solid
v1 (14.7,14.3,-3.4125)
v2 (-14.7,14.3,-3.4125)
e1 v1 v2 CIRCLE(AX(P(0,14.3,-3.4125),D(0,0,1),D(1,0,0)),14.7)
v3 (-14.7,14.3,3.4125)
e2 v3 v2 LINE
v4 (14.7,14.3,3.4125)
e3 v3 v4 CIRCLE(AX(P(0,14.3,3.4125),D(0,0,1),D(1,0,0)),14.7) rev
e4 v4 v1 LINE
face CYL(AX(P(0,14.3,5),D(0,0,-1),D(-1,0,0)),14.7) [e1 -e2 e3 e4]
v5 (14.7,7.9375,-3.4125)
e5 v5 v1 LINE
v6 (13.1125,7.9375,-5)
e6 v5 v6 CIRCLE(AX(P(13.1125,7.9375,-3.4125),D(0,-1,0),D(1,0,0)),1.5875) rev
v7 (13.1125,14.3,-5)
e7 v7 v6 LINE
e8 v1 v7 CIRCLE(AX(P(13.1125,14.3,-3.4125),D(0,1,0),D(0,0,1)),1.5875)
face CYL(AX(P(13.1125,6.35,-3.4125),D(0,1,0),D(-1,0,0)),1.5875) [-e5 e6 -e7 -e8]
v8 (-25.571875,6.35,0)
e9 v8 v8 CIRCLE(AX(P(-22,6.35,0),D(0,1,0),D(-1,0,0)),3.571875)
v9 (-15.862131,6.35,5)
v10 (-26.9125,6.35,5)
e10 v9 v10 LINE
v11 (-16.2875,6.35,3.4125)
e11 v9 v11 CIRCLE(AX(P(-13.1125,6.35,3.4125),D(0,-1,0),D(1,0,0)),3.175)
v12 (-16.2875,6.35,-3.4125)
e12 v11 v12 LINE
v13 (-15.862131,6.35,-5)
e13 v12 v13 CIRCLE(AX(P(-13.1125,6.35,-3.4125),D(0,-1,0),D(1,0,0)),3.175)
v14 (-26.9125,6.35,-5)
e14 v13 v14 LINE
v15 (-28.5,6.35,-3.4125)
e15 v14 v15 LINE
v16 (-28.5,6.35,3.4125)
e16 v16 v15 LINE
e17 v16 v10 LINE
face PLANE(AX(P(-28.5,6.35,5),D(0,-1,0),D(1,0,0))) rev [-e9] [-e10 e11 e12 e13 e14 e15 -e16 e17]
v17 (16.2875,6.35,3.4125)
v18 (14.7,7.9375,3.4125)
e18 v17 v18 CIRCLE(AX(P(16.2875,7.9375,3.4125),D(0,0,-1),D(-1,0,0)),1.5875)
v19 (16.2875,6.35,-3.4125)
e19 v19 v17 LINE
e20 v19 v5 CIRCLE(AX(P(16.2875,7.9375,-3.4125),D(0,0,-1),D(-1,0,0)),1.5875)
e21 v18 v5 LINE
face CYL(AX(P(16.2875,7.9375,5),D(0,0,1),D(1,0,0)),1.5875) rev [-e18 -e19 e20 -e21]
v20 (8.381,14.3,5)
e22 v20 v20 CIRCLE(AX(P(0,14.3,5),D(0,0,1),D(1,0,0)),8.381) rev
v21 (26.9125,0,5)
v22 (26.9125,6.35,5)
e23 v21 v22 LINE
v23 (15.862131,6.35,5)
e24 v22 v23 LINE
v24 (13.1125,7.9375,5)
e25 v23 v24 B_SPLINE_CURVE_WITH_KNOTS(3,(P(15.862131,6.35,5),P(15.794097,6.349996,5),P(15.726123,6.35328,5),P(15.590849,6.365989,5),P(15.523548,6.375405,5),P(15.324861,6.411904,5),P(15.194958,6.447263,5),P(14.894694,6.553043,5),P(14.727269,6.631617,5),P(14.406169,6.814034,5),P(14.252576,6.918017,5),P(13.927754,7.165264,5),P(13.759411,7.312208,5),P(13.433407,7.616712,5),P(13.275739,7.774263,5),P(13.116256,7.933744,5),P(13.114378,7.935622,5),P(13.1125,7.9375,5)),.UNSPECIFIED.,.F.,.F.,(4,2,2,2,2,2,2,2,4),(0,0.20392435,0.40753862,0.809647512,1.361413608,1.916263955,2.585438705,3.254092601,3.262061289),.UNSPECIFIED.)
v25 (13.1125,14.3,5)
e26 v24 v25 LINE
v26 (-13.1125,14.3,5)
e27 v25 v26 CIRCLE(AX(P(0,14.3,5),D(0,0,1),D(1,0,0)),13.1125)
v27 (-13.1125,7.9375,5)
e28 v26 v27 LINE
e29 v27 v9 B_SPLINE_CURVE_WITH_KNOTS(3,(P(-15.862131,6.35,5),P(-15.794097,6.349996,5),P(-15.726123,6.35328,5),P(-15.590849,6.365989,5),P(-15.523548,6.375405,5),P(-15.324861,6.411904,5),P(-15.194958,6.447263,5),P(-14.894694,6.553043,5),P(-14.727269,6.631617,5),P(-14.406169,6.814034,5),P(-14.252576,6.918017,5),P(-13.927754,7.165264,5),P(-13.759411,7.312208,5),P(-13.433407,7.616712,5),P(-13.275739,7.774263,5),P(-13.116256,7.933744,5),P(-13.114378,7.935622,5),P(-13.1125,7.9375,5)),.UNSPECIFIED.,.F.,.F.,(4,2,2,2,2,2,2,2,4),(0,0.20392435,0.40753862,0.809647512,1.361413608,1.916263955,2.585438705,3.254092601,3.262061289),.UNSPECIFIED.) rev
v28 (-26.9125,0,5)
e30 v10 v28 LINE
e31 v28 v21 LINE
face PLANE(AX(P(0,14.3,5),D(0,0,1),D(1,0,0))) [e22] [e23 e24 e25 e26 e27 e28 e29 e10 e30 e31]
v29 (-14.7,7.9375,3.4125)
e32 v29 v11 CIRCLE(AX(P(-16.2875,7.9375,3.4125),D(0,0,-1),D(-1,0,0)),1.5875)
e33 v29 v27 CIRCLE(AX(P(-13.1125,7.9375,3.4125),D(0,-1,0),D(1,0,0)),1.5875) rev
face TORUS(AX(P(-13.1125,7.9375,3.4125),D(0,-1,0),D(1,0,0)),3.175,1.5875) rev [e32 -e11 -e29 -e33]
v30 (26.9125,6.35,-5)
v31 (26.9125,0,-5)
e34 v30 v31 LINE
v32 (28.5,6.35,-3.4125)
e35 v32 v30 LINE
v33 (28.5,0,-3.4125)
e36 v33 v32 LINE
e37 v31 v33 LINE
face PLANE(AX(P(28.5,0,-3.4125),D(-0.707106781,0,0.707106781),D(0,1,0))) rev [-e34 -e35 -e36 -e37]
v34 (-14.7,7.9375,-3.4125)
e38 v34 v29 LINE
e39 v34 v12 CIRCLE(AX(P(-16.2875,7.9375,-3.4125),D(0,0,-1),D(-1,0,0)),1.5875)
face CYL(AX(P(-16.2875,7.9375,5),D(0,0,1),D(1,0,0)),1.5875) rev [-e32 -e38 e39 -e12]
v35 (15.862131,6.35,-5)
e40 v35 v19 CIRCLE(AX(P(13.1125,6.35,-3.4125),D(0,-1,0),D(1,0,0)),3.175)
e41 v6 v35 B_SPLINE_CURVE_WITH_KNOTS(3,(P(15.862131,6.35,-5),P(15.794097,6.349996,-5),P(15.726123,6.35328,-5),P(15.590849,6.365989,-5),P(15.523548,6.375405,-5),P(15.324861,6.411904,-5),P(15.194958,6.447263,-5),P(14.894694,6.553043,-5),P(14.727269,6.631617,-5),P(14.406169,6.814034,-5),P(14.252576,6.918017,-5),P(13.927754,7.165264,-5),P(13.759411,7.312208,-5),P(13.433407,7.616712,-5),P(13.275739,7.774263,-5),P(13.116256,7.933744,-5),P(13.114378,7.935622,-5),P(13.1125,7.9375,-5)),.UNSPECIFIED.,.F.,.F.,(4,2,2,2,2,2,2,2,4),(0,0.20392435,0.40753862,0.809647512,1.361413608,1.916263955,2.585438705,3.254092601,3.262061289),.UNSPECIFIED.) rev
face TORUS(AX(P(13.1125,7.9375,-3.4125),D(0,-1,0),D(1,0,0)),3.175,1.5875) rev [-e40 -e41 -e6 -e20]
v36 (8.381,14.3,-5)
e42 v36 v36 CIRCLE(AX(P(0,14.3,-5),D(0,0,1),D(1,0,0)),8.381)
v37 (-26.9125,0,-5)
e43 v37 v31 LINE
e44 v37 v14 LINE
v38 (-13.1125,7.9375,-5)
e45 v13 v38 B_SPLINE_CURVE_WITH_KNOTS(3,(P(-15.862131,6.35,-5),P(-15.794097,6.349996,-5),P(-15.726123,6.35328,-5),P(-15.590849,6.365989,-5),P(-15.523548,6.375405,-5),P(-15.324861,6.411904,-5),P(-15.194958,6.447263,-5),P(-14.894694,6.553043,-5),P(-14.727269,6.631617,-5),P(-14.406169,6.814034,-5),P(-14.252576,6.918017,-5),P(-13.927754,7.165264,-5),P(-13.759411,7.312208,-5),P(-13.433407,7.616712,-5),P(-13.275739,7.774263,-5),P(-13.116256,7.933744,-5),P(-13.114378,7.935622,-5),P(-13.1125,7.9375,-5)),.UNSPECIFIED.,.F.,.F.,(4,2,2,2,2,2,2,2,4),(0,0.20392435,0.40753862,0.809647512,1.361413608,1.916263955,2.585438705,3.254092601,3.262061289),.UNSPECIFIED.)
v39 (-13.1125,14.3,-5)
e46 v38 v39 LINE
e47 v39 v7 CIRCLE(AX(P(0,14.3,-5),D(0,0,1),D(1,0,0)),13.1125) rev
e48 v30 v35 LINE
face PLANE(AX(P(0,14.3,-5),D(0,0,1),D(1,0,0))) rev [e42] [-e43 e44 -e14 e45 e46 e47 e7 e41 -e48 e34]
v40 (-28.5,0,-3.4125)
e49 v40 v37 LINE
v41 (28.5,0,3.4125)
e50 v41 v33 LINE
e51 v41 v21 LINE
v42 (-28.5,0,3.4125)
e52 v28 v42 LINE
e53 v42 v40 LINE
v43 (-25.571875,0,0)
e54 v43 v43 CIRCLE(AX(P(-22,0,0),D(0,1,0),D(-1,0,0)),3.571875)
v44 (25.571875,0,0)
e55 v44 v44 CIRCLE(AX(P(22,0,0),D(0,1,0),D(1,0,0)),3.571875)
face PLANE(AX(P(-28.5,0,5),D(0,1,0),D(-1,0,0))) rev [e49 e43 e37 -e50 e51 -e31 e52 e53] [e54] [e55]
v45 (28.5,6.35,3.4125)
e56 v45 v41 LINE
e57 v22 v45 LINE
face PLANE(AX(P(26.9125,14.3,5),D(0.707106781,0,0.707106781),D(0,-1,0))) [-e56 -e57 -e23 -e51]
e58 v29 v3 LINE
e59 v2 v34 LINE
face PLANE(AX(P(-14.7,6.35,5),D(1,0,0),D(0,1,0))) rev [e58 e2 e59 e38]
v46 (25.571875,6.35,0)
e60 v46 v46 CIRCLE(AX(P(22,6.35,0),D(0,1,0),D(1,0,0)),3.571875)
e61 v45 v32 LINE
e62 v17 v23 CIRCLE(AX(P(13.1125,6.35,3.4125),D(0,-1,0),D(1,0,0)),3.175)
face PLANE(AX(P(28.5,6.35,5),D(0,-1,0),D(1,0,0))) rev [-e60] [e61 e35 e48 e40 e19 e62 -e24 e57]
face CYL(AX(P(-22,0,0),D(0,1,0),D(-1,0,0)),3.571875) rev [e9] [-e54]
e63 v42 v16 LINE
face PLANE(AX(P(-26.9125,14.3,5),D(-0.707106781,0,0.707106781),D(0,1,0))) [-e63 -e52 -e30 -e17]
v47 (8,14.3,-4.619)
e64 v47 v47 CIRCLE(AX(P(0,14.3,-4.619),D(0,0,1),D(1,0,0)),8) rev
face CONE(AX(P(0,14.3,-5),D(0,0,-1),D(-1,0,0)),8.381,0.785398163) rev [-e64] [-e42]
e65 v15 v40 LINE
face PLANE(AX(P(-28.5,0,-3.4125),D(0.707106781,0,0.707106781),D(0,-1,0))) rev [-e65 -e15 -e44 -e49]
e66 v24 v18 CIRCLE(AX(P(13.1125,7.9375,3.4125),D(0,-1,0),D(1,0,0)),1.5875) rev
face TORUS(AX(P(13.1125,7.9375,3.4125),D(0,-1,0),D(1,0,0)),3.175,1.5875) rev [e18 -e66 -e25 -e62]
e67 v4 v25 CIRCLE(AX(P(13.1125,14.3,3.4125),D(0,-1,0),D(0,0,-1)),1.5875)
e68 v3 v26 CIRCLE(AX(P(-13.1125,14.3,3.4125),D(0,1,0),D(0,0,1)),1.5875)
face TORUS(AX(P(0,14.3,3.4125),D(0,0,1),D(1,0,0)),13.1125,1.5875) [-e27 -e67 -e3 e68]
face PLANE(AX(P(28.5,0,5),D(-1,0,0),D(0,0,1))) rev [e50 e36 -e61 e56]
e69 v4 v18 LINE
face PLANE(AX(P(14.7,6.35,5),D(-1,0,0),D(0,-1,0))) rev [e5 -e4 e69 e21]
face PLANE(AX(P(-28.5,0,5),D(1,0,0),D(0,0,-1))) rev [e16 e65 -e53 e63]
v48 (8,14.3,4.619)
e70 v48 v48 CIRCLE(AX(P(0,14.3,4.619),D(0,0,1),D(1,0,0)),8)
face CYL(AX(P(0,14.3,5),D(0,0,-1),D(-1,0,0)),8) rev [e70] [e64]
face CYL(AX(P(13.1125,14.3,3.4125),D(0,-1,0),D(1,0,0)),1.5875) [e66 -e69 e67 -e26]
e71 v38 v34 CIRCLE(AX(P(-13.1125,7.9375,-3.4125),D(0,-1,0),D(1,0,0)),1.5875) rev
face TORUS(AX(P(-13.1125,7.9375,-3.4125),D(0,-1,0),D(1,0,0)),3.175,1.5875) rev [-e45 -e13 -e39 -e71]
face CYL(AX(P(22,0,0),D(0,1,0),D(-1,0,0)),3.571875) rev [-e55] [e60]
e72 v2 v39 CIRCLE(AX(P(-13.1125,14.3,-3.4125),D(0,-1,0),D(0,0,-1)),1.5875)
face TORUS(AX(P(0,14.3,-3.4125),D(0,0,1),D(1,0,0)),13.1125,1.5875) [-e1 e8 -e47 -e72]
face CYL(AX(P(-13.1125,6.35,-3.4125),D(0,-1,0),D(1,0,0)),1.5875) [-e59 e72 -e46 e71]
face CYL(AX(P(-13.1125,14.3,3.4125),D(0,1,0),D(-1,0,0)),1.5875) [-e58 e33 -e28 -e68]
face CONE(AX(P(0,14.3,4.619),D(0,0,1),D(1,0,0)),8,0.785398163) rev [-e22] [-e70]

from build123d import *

# Parameters (mm, degrees)
SKETCH2_R          = 8
BODY_EXTRUDE_DEPTH = 5
BODY_FILLET_A_R    = 1.5875
BODY_FILLET_B_R    = 1.5875
CHAMFER2_SIZE      = 1.5875
ID_CHAMFER_SIZE    = 0.381
SKETCH3_R          = 3.571875
HOLE_CUT_DEPTH     = 37.746054285


with BuildPart() as part:
    # Sketch2 → Body Extrude (new, symmetric)
    with BuildSketch(Plane.XY):
        with BuildLine():
            Line((-28.5, 0), (-28.5, 6.35))
            Line((-28.5, 6.35), (-14.7, 6.35))
            Line((-14.7, 6.35), (-14.7, 14.3))
            ThreePointArc((-14.7, 14.3), (0, 29), (14.7, 14.3))
            Line((14.7, 14.3), (14.7, 6.35))
            Line((14.7, 6.35), (28.5, 6.35))
            Line((28.5, 6.35), (28.5, 0))
            Line((28.5, 0), (-28.5, 0))
        make_face()
        with Locations((0, 14.3)):
            Circle(SKETCH2_R, mode=Mode.SUBTRACT)
    extrude(amount=BODY_EXTRUDE_DEPTH, both=True)

    # Body Fillet A
    body_fillet_a_edges = [part.edges().sort_by_distance(p)[0] for p in [
        (14.7, 10.325, 5),
        (0, 29, 5),
        (-14.7, 10.325, 5),
        (-14.7, 10.325, -5),
        (0, 29, -5),
        (14.7, 10.325, -5),
    ]]
    fillet(body_fillet_a_edges, radius=BODY_FILLET_A_R)

    # Body Fillet B
    # the kernel refuses this fillet: 1.5875 mm, written as the material it adds along each edge
    with BuildSketch(Plane(origin=(-14.7, 6.35, 3.4125), x_dir=(0, 1, 0), z_dir=(0, 0, -1))) as body_fillet_b_piece_1:
        with BuildLine():
            CenterArc((BODY_FILLET_B_R, -BODY_FILLET_B_R), BODY_FILLET_B_R, 90, 90)
            Line((0, -BODY_FILLET_B_R), (0, 0))
            Line((0, 0), (BODY_FILLET_B_R, 0))
        make_face()
    extrude(amount=6.825)
    with BuildSketch(Plane(origin=(14.7, 6.35, 3.4125), x_dir=(0, 1, 0), z_dir=(0, 0, -1))) as body_fillet_b_piece_2:
        with BuildLine():
            CenterArc((BODY_FILLET_B_R, BODY_FILLET_B_R), BODY_FILLET_B_R, 180, 90)
            Line((0, BODY_FILLET_B_R), (0, 0))
            Line((0, 0), (BODY_FILLET_B_R, 0))
        make_face()
    extrude(amount=6.825)
    with BuildSketch(Plane(origin=(-13.1125, 6.35, -3.4125), x_dir=(-1, 0, 0), z_dir=(0, 0, 1))) as body_fillet_b_piece_3_section:
        with BuildLine():
            CenterArc((1.5875 + BODY_FILLET_B_R, -BODY_FILLET_B_R), BODY_FILLET_B_R, 90, 90)
            Line((1.5875 + BODY_FILLET_B_R, 0), (1.5875, 0))
            Line((1.5875, 0), (1.5875, -BODY_FILLET_B_R))
        make_face()
    body_fillet_b_piece_3 = revolve(axis=Axis((-13.1125, 6.35, -3.4125), (0, -1, 0)), revolution_arc=233.296989237, mode=Mode.PRIVATE)
    body_fillet_b_piece_3 = split(body_fillet_b_piece_3, bisect_by=Plane(origin=(-14.303028138, 6.844709666, -5), z_dir=(0, 0, 1)), keep=Keep.TOP, mode=Mode.PRIVATE)
    add(body_fillet_b_piece_3)
    with BuildSketch(Plane(origin=(13.1125, 6.35, 3.4125), x_dir=(-0.597667277632828, 0, -0.8017442392976478), z_dir=(0.8017442392976478, 0, -0.597667277632828))) as body_fillet_b_piece_4_section:
        with BuildLine():
            CenterArc((1.5875 + BODY_FILLET_B_R, BODY_FILLET_B_R), BODY_FILLET_B_R, 180, 90)
            Line((1.5875, BODY_FILLET_B_R), (1.5875, 0))
            Line((1.5875, 0), (1.5875 + BODY_FILLET_B_R, 0))
        make_face()
    body_fillet_b_piece_4 = revolve(axis=Axis((13.1125, 6.35, 3.4125), (0, 1, 0)), revolution_arc=233.296989237, mode=Mode.PRIVATE)
    body_fillet_b_piece_4 = split(body_fillet_b_piece_4, bisect_by=Plane(origin=(14.303027956, 6.844710216, 5), z_dir=(0, 0, -1)), keep=Keep.TOP, mode=Mode.PRIVATE)
    add(body_fillet_b_piece_4)
    with BuildSketch(Plane(origin=(13.1125, 6.35, -3.4125), x_dir=(1, 0, 0), z_dir=(0, 0, 1))) as body_fillet_b_piece_5_section:
        with BuildLine():
            CenterArc((1.5875 + BODY_FILLET_B_R, BODY_FILLET_B_R), BODY_FILLET_B_R, 180, 90)
            Line((1.5875 + BODY_FILLET_B_R, 0), (1.5875, 0))
            Line((1.5875, 0), (1.5875, BODY_FILLET_B_R))
        make_face()
    body_fillet_b_piece_5 = revolve(axis=Axis((13.1125, 6.35, -3.4125), (0, 1, 0)), revolution_arc=233.296989237, mode=Mode.PRIVATE)
    body_fillet_b_piece_5 = split(body_fillet_b_piece_5, bisect_by=Plane(origin=(14.303027986, 6.84471004, -5), z_dir=(0, 0, 1)), keep=Keep.TOP, mode=Mode.PRIVATE)
    add(body_fillet_b_piece_5)
    with BuildSketch(Plane(origin=(-13.1125, 6.35, 3.4125), x_dir=(0.597667277632828, 0, -0.8017442392976478), z_dir=(-0.8017442392976478, 0, -0.597667277632828))) as body_fillet_b_piece_6_section:
        with BuildLine():
            CenterArc((1.5875 + BODY_FILLET_B_R, -BODY_FILLET_B_R), BODY_FILLET_B_R, 90, 90)
            Line((1.5875 + BODY_FILLET_B_R, 0), (1.5875, 0))
            Line((1.5875, 0), (1.5875, -BODY_FILLET_B_R))
        make_face()
    body_fillet_b_piece_6 = revolve(axis=Axis((-13.1125, 6.35, 3.4125), (0, -1, 0)), revolution_arc=233.296989237, mode=Mode.PRIVATE)
    body_fillet_b_piece_6 = split(body_fillet_b_piece_6, bisect_by=Plane(origin=(-14.30302807, 6.844709941, 5), z_dir=(0, 0, -1)), keep=Keep.TOP, mode=Mode.PRIVATE)
    add(body_fillet_b_piece_6)

    # Chamfer2
    chamfer2_edges = [part.edges().sort_by_distance(p)[0] for p in [
        (28.5, 3.175, -5),
        (-28.5, 3.175, 5),
        (28.5, 3.175, 5),
        (-28.5, 3.175, -5),
    ]]
    chamfer(chamfer2_edges, length=CHAMFER2_SIZE)

    # ID Chamfer
    id_chamfer_edges = [part.edges().sort_by_distance(p)[0] for p in [
        (-8, 14.3, -5),
        (-8, 14.3, 5),
    ]]
    chamfer(id_chamfer_edges, length=ID_CHAMFER_SIZE)

    # Sketch3 → Hole Cut (cut, through all)
    with BuildSketch(Plane(origin=(0, 6.35, 0), x_dir=(1, 0, 0), z_dir=(0, 1, 0))):
        with Locations(Location((-22, 0, 0), (0, 0, 180))):
            Circle(SKETCH3_R)
        with Locations((22, 0)):
            Circle(SKETCH3_R)
    extrude(amount=-HOLE_CUT_DEPTH, mode=Mode.SUBTRACT)


solid = part.part
